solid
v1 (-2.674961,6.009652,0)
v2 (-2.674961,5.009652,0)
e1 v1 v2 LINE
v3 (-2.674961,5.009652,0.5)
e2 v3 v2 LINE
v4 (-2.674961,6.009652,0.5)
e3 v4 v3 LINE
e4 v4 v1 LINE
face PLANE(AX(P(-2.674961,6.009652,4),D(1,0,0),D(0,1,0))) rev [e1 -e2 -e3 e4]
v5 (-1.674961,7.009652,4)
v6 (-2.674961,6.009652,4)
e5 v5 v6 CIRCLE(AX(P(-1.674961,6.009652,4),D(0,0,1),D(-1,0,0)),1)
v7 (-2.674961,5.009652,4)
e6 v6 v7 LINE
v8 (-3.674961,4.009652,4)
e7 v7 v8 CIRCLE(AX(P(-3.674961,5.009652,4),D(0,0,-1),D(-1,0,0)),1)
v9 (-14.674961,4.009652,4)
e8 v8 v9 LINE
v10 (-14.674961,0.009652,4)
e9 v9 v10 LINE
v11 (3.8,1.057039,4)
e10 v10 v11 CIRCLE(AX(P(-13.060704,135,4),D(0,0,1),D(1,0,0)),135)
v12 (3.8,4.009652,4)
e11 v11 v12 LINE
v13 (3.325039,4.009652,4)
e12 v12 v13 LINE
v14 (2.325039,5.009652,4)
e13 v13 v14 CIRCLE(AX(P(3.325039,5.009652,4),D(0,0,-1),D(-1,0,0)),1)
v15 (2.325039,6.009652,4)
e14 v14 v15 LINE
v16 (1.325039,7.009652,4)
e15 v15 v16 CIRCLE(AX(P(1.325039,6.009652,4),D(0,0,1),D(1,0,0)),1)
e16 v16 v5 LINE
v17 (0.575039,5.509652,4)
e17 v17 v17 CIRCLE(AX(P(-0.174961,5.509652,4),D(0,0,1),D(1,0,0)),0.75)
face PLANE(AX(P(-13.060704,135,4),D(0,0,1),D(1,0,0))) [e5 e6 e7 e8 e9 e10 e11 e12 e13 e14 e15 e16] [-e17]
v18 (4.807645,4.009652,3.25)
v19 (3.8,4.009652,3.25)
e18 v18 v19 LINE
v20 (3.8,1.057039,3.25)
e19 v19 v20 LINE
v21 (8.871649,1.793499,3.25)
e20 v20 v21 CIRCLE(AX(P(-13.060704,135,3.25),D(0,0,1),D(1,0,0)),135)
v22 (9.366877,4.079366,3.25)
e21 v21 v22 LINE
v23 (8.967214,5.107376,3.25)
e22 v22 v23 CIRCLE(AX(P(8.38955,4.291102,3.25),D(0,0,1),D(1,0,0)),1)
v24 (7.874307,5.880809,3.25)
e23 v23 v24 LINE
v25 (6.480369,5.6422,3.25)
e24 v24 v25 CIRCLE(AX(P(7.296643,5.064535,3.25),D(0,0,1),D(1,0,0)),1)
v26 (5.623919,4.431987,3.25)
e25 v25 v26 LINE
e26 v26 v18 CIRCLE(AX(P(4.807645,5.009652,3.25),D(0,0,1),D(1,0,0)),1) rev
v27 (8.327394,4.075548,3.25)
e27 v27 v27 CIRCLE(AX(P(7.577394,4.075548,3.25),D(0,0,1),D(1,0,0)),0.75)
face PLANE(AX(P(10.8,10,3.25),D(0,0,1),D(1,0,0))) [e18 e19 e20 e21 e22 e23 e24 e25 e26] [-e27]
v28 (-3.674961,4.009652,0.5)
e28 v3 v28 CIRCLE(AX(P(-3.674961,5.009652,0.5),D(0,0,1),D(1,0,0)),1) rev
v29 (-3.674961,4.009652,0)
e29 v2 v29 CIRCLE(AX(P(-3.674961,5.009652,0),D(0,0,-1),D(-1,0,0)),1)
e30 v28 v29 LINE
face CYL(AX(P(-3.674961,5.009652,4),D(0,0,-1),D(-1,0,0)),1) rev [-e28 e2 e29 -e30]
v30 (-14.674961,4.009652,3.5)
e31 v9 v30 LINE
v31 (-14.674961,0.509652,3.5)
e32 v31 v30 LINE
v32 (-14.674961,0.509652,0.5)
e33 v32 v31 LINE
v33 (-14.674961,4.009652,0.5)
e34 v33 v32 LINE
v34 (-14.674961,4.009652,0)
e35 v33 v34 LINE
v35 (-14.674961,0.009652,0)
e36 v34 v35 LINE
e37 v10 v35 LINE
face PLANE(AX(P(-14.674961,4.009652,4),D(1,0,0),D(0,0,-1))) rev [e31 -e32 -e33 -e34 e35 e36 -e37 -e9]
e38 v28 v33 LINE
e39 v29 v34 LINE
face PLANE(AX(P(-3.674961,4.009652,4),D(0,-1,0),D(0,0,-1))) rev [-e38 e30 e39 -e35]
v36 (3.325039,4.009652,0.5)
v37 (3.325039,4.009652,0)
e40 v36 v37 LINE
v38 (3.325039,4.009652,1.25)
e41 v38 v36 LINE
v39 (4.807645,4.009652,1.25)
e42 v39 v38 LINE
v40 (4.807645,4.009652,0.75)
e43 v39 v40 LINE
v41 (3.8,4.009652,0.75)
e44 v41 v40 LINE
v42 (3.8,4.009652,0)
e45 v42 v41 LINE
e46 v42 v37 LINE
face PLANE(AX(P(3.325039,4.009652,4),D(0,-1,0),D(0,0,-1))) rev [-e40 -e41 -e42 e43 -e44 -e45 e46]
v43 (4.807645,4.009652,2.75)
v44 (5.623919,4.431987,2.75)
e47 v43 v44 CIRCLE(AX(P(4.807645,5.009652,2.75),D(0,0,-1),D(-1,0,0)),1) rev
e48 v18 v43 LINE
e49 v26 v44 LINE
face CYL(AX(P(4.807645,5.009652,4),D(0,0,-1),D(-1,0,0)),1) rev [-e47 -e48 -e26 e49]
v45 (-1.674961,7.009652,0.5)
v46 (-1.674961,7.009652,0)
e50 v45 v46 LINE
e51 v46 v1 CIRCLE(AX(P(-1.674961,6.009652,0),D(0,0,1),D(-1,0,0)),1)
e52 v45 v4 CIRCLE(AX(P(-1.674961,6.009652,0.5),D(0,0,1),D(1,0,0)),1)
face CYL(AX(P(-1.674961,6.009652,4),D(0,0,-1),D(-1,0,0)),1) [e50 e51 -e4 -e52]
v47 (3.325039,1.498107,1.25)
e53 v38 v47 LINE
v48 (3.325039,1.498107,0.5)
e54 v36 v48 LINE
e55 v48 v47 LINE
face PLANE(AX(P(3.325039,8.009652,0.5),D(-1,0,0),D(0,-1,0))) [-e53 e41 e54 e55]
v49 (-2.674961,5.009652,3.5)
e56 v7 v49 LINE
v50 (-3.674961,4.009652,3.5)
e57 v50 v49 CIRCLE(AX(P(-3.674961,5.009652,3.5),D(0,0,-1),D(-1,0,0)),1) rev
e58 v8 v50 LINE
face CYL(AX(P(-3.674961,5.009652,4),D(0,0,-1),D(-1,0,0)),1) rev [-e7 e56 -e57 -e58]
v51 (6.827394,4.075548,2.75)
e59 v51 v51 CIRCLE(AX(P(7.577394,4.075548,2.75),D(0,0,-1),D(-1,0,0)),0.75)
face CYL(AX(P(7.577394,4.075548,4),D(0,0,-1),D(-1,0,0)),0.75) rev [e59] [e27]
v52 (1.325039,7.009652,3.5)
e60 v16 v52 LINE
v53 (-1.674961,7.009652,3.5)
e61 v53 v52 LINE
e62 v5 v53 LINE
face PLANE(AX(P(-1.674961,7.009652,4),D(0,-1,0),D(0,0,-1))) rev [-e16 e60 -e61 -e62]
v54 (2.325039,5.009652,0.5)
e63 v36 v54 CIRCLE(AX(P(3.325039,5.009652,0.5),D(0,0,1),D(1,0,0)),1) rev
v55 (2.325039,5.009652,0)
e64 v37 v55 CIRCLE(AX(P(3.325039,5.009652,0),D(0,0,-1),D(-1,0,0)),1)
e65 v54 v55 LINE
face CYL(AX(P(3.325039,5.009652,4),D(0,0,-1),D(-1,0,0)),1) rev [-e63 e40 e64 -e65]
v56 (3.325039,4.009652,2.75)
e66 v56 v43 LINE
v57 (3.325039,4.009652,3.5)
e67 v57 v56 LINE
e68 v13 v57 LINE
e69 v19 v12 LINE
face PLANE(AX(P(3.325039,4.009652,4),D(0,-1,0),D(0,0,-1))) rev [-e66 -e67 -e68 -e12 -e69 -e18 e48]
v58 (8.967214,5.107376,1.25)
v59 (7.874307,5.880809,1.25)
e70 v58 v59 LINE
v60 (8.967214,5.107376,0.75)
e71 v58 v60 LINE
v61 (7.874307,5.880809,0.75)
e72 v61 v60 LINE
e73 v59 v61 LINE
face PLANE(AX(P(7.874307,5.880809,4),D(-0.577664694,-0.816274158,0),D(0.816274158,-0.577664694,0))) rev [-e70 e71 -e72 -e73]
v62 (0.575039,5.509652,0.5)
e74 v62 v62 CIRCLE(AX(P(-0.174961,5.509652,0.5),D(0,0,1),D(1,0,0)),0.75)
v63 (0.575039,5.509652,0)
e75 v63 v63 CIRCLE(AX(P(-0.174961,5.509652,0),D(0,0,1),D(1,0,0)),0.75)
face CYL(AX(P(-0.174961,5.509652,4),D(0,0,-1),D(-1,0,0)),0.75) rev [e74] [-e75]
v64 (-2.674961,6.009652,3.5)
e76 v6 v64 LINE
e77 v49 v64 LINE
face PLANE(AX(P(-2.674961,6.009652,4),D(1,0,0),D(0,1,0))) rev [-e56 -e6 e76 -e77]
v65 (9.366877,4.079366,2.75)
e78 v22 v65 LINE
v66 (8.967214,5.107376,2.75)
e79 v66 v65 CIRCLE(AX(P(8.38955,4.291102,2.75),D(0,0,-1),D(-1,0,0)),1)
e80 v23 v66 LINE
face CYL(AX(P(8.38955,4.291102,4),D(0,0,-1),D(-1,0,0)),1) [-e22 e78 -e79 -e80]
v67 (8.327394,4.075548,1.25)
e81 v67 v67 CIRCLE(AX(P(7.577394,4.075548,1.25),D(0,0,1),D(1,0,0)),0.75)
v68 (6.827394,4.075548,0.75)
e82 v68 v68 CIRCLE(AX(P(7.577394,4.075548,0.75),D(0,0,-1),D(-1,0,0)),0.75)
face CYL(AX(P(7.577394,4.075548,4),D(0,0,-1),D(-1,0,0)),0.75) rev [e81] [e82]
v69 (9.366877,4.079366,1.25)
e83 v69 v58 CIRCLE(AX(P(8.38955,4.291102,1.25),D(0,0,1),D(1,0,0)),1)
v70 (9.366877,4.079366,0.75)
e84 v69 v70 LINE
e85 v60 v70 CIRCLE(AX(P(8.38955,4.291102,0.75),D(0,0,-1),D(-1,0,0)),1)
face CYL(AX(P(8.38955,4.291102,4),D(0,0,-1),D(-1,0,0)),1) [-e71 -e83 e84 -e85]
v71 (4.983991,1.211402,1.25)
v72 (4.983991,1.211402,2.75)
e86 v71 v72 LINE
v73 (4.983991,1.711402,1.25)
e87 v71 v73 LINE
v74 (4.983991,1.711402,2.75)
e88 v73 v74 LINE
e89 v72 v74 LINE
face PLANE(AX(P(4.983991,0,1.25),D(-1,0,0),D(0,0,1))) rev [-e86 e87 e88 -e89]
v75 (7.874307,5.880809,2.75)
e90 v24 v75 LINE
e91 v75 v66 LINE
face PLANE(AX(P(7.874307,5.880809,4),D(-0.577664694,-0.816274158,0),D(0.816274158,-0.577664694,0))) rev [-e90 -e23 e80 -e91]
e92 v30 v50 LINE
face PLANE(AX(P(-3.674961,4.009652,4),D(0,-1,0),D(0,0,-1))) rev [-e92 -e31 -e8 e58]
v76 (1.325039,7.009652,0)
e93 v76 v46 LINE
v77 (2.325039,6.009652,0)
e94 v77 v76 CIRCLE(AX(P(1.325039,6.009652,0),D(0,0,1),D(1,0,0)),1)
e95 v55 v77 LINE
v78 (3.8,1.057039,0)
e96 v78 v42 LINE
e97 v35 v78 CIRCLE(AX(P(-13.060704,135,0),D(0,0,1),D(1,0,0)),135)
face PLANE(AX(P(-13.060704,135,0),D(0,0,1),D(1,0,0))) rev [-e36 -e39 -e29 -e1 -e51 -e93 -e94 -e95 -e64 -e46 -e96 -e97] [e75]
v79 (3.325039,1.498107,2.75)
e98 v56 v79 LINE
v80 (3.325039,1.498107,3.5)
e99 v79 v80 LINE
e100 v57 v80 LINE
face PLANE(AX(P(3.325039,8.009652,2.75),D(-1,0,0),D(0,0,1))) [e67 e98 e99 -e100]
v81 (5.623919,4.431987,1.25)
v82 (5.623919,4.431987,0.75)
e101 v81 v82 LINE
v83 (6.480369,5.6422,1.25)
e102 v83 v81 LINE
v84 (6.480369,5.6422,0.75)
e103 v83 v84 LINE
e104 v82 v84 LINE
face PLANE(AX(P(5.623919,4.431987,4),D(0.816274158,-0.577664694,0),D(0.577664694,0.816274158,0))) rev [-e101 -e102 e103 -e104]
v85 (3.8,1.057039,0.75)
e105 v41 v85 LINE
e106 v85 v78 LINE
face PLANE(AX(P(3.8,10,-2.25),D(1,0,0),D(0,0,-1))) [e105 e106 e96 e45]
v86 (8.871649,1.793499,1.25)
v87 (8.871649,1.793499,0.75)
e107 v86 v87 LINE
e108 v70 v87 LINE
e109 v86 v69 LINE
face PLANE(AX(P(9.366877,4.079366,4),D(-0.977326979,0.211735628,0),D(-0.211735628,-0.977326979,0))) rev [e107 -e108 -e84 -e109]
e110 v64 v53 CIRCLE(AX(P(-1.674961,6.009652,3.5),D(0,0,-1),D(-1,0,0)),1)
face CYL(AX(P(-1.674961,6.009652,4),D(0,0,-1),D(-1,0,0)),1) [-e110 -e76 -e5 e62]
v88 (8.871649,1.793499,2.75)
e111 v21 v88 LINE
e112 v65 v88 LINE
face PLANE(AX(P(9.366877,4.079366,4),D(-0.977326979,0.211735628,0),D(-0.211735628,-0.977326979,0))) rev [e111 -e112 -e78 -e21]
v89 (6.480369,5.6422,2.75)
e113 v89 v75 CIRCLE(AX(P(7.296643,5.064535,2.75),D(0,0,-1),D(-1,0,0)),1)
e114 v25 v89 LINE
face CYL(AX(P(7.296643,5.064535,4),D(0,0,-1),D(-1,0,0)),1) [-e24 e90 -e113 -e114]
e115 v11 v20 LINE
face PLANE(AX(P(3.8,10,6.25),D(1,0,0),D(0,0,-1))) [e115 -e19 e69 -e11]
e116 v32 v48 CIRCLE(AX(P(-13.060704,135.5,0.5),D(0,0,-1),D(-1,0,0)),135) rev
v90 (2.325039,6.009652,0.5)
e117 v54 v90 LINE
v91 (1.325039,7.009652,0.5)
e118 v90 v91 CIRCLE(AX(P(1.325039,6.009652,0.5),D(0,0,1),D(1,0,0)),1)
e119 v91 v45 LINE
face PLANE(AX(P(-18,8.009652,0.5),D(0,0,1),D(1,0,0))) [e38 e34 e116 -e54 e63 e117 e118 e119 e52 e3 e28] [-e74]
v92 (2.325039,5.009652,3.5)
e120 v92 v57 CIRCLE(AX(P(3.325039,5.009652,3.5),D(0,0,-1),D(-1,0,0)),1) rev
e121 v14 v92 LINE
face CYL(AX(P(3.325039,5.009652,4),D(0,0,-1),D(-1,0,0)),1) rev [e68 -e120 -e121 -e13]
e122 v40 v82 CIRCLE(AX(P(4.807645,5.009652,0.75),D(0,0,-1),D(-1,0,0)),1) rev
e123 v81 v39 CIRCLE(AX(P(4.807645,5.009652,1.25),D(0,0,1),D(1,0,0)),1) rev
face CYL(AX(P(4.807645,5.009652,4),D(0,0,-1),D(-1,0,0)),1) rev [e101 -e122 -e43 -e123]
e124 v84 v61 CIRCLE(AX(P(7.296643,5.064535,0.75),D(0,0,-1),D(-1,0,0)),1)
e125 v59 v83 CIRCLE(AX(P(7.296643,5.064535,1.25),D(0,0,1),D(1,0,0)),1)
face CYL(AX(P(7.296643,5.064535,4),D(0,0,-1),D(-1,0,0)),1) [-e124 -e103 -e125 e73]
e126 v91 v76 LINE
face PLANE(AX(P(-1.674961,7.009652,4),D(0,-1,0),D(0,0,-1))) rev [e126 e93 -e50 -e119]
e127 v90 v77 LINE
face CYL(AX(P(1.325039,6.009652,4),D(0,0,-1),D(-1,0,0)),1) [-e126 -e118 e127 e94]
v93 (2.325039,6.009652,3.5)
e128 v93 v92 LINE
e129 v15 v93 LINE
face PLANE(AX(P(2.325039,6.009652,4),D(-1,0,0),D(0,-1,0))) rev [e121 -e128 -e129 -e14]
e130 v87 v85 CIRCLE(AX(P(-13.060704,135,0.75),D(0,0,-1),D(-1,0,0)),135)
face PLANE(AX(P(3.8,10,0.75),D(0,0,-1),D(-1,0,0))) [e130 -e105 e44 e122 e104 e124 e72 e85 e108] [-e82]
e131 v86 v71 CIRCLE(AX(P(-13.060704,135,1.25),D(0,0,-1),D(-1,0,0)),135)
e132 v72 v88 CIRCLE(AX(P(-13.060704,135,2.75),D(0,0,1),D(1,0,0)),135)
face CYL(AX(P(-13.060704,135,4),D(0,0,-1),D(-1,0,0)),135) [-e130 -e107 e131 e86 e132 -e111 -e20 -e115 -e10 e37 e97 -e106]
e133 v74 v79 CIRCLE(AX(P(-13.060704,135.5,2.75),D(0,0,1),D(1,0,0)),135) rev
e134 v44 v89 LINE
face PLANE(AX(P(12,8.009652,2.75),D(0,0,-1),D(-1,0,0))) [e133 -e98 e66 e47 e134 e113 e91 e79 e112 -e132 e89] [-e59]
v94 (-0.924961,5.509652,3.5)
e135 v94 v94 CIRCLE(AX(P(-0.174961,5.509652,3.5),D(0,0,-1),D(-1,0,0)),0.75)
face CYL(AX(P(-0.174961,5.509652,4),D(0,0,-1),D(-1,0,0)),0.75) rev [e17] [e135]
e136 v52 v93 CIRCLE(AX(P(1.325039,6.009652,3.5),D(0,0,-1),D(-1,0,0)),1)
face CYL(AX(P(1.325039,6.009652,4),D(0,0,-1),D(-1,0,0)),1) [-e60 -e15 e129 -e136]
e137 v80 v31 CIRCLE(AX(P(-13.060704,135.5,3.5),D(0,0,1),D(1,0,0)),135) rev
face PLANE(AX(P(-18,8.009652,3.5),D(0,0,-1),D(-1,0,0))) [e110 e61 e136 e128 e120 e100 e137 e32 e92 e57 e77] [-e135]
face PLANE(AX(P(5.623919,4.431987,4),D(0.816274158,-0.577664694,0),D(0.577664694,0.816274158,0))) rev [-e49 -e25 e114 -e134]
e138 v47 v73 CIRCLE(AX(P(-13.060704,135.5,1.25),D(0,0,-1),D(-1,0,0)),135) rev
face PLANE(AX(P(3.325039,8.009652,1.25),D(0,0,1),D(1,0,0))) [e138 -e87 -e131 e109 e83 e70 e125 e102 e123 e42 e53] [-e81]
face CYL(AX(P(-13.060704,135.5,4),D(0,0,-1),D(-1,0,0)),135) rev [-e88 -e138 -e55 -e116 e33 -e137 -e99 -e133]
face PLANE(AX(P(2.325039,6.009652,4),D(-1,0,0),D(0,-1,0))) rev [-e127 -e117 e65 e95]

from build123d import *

# Parameters (mm, degrees)
SCHIZZO2_R                     = 0.75
ESTRUSIONE_ESTRUSIONE1_DEPTH   = 4
TAGLIO_ESTRUSIONE1_START       = 0.5
TAGLIO_ESTRUSIONE1_OUTLINE_R   = 0.75
TAGLIO_ESTRUSIONE1_DEPTH       = 3
TAGLIO_ESTRUSIONE1_START_2     = 1.25
TAGLIO_ESTRUSIONE1_2_OUTLINE_R = 0.75
TAGLIO_ESTRUSIONE1_2_DEPTH     = 1.5
SCHIZZO5_W                     = 7
SCHIZZO5_H                     = 3
TAGLIO_ESTRUSIONE4_DEPTH       = 10
SCHIZZO6_W                     = 4
SCHIZZO6_H                     = 1.5
TAGLIO_ESTRUSIONE5_DEPTH       = 17.747826397


# Read off the part's stored shape, not the designer's step: Taglio-Estrusione1
with BuildPart() as part:
    # Schizzo2 → Estrusione-Estrusione1 (new body)
    with BuildSketch(Plane.XY):
        with BuildLine():
            Line((-1.674960789, 7.009651551), (1.325039211, 7.009651551))
            ThreePointArc((1.325039211, 7.009651551), (2.032145992, 6.716758332), (2.325039211, 6.009651551))
            Line((2.325039211, 6.009651551), (2.325039211, 5.009651551))
            ThreePointArc((2.325039211, 5.009651551), (2.61793243, 4.30254477), (3.325039211, 4.009651551))
            Line((3.325039211, 4.009651551), (4.807645267, 4.009651551))
            ThreePointArc((4.807645267, 4.009651551), (5.267175084, 4.121489209), (5.623919425, 4.431986858))
            Line((5.623919425, 4.431986858), (6.480368598, 5.642199868))
            ThreePointArc((6.480368598, 5.642199868), (7.127920386, 6.050198789), (7.87430745, 5.880809333))
            Line((7.87430745, 5.880809333), (8.967214405, 5.107375855))
            ThreePointArc((8.967214405, 5.107375855), (9.321590916, 4.653454003), (9.366876691, 4.079366068))
            Line((9.366876691, 4.079366068), (8.871648882, 1.793499009))
            ThreePointArc((8.871648882, 1.793499009), (-2.862577448, 0.385742883), (-14.674960789, 0.009651551))
            Line((-14.674960789, 0.009651551), (-14.674960789, 4.009651551))
            Line((-14.674960789, 4.009651551), (-3.674960789, 4.009651551))
            ThreePointArc((-3.674960789, 4.009651551), (-2.967854008, 4.30254477), (-2.674960789, 5.009651551))
            Line((-2.674960789, 5.009651551), (-2.674960789, 6.009651551))
            ThreePointArc((-2.674960789, 6.009651551), (-2.38206757, 6.716758332), (-1.674960789, 7.009651551))
        make_face()
        with Locations((-0.174960789, 5.509651551)):
            Circle(SCHIZZO2_R, mode=Mode.SUBTRACT)
        with Locations((7.577394386, 4.07554752)):
            Circle(SCHIZZO2_R, mode=Mode.SUBTRACT)
    extrude(amount=ESTRUSIONE_ESTRUSIONE1_DEPTH)

    # Taglio-Estrusione1 outline → Taglio-Estrusione1 (cut)
    with BuildSketch(Plane.XY.offset(TAGLIO_ESTRUSIONE1_START)):
        with BuildLine():
            ThreePointArc((-14.674960789, 0.509651551), (-5.658443288, 0.703091506), (3.325039211, 1.498106631))
            Line((3.325039211, 1.498106631), (3.325039211, 4.009651551))
            ThreePointArc((3.325039211, 4.009651551), (2.61793243, 4.30254477), (2.325039211, 5.009651551))
            Line((2.325039211, 5.009651551), (2.325039211, 6.009651551))
            ThreePointArc((2.325039211, 6.009651551), (2.032145992, 6.716758332), (1.325039211, 7.009651551))
            Line((1.325039211, 7.009651551), (-1.674960789, 7.009651551))
            ThreePointArc((-1.674960789, 7.009651551), (-2.38206757, 6.716758332), (-2.674960789, 6.009651551))
            Line((-2.674960789, 6.009651551), (-2.674960789, 5.009651551))
            ThreePointArc((-2.674960789, 5.009651551), (-2.967854008, 4.30254477), (-3.674960789, 4.009651551))
            Line((-3.674960789, 4.009651551), (-14.674960789, 4.009651551))
            Line((-14.674960789, 4.009651551), (-14.674960789, 0.509651551))
        make_face()
        with Locations((-0.174960789, 5.509651551)):
            Circle(TAGLIO_ESTRUSIONE1_OUTLINE_R, mode=Mode.SUBTRACT)
    extrude(amount=TAGLIO_ESTRUSIONE1_DEPTH, mode=Mode.SUBTRACT)

    # Taglio-Estrusione1 2 outline → Taglio-Estrusione1 2 (cut)
    with BuildSketch(Plane.XY.offset(TAGLIO_ESTRUSIONE1_START_2)):
        with BuildLine():
            ThreePointArc((3.325039211, 1.498106631), (6.158824123, 1.87511554), (8.983990596, 2.312044653))
            Line((8.983990596, 2.312044653), (9.366876691, 4.079366068))
            ThreePointArc((9.366876691, 4.079366068), (9.321590916, 4.653454003), (8.967214405, 5.107375855))
            Line((8.967214405, 5.107375855), (7.87430745, 5.880809333))
            ThreePointArc((7.87430745, 5.880809333), (7.127920386, 6.050198789), (6.480368598, 5.642199868))
            Line((6.480368598, 5.642199868), (5.623919425, 4.431986858))
            ThreePointArc((5.623919425, 4.431986858), (5.267175084, 4.121489209), (4.807645267, 4.009651551))
            Line((4.807645267, 4.009651551), (3.325039211, 4.009651551))
            Line((3.325039211, 4.009651551), (3.325039211, 1.498106631))
        make_face()
        with Locations((7.577394386, 4.07554752)):
            Circle(TAGLIO_ESTRUSIONE1_2_OUTLINE_R, mode=Mode.SUBTRACT)
    extrude(amount=TAGLIO_ESTRUSIONE1_2_DEPTH, mode=Mode.SUBTRACT)

    # Schizzo5 → Taglio-Estrusione4 (cut)
    with BuildSketch(Plane(origin=(0, 0, 0), x_dir=(1, 0, 0), z_dir=(0, 1, 0))):
        with Locations((7.3, 0.75)):
            Rectangle(SCHIZZO5_W, SCHIZZO5_H)
        with Locations((7.3, -4.75)):
            Rectangle(SCHIZZO5_W, SCHIZZO5_H)
    extrude(amount=TAGLIO_ESTRUSIONE4_DEPTH, mode=Mode.SUBTRACT)

    # Schizzo6 → Taglio-Estrusione5 (cut, through all)
    with BuildSketch(Plane(origin=(0, 7.009651551, 0), x_dir=(1, 0, 0), z_dir=(0, 1, 0))):
        with Locations((6.983990596, -2)):
            Rectangle(SCHIZZO6_W, SCHIZZO6_H)
    extrude(amount=-TAGLIO_ESTRUSIONE5_DEPTH, mode=Mode.SUBTRACT)


solid = part.part
